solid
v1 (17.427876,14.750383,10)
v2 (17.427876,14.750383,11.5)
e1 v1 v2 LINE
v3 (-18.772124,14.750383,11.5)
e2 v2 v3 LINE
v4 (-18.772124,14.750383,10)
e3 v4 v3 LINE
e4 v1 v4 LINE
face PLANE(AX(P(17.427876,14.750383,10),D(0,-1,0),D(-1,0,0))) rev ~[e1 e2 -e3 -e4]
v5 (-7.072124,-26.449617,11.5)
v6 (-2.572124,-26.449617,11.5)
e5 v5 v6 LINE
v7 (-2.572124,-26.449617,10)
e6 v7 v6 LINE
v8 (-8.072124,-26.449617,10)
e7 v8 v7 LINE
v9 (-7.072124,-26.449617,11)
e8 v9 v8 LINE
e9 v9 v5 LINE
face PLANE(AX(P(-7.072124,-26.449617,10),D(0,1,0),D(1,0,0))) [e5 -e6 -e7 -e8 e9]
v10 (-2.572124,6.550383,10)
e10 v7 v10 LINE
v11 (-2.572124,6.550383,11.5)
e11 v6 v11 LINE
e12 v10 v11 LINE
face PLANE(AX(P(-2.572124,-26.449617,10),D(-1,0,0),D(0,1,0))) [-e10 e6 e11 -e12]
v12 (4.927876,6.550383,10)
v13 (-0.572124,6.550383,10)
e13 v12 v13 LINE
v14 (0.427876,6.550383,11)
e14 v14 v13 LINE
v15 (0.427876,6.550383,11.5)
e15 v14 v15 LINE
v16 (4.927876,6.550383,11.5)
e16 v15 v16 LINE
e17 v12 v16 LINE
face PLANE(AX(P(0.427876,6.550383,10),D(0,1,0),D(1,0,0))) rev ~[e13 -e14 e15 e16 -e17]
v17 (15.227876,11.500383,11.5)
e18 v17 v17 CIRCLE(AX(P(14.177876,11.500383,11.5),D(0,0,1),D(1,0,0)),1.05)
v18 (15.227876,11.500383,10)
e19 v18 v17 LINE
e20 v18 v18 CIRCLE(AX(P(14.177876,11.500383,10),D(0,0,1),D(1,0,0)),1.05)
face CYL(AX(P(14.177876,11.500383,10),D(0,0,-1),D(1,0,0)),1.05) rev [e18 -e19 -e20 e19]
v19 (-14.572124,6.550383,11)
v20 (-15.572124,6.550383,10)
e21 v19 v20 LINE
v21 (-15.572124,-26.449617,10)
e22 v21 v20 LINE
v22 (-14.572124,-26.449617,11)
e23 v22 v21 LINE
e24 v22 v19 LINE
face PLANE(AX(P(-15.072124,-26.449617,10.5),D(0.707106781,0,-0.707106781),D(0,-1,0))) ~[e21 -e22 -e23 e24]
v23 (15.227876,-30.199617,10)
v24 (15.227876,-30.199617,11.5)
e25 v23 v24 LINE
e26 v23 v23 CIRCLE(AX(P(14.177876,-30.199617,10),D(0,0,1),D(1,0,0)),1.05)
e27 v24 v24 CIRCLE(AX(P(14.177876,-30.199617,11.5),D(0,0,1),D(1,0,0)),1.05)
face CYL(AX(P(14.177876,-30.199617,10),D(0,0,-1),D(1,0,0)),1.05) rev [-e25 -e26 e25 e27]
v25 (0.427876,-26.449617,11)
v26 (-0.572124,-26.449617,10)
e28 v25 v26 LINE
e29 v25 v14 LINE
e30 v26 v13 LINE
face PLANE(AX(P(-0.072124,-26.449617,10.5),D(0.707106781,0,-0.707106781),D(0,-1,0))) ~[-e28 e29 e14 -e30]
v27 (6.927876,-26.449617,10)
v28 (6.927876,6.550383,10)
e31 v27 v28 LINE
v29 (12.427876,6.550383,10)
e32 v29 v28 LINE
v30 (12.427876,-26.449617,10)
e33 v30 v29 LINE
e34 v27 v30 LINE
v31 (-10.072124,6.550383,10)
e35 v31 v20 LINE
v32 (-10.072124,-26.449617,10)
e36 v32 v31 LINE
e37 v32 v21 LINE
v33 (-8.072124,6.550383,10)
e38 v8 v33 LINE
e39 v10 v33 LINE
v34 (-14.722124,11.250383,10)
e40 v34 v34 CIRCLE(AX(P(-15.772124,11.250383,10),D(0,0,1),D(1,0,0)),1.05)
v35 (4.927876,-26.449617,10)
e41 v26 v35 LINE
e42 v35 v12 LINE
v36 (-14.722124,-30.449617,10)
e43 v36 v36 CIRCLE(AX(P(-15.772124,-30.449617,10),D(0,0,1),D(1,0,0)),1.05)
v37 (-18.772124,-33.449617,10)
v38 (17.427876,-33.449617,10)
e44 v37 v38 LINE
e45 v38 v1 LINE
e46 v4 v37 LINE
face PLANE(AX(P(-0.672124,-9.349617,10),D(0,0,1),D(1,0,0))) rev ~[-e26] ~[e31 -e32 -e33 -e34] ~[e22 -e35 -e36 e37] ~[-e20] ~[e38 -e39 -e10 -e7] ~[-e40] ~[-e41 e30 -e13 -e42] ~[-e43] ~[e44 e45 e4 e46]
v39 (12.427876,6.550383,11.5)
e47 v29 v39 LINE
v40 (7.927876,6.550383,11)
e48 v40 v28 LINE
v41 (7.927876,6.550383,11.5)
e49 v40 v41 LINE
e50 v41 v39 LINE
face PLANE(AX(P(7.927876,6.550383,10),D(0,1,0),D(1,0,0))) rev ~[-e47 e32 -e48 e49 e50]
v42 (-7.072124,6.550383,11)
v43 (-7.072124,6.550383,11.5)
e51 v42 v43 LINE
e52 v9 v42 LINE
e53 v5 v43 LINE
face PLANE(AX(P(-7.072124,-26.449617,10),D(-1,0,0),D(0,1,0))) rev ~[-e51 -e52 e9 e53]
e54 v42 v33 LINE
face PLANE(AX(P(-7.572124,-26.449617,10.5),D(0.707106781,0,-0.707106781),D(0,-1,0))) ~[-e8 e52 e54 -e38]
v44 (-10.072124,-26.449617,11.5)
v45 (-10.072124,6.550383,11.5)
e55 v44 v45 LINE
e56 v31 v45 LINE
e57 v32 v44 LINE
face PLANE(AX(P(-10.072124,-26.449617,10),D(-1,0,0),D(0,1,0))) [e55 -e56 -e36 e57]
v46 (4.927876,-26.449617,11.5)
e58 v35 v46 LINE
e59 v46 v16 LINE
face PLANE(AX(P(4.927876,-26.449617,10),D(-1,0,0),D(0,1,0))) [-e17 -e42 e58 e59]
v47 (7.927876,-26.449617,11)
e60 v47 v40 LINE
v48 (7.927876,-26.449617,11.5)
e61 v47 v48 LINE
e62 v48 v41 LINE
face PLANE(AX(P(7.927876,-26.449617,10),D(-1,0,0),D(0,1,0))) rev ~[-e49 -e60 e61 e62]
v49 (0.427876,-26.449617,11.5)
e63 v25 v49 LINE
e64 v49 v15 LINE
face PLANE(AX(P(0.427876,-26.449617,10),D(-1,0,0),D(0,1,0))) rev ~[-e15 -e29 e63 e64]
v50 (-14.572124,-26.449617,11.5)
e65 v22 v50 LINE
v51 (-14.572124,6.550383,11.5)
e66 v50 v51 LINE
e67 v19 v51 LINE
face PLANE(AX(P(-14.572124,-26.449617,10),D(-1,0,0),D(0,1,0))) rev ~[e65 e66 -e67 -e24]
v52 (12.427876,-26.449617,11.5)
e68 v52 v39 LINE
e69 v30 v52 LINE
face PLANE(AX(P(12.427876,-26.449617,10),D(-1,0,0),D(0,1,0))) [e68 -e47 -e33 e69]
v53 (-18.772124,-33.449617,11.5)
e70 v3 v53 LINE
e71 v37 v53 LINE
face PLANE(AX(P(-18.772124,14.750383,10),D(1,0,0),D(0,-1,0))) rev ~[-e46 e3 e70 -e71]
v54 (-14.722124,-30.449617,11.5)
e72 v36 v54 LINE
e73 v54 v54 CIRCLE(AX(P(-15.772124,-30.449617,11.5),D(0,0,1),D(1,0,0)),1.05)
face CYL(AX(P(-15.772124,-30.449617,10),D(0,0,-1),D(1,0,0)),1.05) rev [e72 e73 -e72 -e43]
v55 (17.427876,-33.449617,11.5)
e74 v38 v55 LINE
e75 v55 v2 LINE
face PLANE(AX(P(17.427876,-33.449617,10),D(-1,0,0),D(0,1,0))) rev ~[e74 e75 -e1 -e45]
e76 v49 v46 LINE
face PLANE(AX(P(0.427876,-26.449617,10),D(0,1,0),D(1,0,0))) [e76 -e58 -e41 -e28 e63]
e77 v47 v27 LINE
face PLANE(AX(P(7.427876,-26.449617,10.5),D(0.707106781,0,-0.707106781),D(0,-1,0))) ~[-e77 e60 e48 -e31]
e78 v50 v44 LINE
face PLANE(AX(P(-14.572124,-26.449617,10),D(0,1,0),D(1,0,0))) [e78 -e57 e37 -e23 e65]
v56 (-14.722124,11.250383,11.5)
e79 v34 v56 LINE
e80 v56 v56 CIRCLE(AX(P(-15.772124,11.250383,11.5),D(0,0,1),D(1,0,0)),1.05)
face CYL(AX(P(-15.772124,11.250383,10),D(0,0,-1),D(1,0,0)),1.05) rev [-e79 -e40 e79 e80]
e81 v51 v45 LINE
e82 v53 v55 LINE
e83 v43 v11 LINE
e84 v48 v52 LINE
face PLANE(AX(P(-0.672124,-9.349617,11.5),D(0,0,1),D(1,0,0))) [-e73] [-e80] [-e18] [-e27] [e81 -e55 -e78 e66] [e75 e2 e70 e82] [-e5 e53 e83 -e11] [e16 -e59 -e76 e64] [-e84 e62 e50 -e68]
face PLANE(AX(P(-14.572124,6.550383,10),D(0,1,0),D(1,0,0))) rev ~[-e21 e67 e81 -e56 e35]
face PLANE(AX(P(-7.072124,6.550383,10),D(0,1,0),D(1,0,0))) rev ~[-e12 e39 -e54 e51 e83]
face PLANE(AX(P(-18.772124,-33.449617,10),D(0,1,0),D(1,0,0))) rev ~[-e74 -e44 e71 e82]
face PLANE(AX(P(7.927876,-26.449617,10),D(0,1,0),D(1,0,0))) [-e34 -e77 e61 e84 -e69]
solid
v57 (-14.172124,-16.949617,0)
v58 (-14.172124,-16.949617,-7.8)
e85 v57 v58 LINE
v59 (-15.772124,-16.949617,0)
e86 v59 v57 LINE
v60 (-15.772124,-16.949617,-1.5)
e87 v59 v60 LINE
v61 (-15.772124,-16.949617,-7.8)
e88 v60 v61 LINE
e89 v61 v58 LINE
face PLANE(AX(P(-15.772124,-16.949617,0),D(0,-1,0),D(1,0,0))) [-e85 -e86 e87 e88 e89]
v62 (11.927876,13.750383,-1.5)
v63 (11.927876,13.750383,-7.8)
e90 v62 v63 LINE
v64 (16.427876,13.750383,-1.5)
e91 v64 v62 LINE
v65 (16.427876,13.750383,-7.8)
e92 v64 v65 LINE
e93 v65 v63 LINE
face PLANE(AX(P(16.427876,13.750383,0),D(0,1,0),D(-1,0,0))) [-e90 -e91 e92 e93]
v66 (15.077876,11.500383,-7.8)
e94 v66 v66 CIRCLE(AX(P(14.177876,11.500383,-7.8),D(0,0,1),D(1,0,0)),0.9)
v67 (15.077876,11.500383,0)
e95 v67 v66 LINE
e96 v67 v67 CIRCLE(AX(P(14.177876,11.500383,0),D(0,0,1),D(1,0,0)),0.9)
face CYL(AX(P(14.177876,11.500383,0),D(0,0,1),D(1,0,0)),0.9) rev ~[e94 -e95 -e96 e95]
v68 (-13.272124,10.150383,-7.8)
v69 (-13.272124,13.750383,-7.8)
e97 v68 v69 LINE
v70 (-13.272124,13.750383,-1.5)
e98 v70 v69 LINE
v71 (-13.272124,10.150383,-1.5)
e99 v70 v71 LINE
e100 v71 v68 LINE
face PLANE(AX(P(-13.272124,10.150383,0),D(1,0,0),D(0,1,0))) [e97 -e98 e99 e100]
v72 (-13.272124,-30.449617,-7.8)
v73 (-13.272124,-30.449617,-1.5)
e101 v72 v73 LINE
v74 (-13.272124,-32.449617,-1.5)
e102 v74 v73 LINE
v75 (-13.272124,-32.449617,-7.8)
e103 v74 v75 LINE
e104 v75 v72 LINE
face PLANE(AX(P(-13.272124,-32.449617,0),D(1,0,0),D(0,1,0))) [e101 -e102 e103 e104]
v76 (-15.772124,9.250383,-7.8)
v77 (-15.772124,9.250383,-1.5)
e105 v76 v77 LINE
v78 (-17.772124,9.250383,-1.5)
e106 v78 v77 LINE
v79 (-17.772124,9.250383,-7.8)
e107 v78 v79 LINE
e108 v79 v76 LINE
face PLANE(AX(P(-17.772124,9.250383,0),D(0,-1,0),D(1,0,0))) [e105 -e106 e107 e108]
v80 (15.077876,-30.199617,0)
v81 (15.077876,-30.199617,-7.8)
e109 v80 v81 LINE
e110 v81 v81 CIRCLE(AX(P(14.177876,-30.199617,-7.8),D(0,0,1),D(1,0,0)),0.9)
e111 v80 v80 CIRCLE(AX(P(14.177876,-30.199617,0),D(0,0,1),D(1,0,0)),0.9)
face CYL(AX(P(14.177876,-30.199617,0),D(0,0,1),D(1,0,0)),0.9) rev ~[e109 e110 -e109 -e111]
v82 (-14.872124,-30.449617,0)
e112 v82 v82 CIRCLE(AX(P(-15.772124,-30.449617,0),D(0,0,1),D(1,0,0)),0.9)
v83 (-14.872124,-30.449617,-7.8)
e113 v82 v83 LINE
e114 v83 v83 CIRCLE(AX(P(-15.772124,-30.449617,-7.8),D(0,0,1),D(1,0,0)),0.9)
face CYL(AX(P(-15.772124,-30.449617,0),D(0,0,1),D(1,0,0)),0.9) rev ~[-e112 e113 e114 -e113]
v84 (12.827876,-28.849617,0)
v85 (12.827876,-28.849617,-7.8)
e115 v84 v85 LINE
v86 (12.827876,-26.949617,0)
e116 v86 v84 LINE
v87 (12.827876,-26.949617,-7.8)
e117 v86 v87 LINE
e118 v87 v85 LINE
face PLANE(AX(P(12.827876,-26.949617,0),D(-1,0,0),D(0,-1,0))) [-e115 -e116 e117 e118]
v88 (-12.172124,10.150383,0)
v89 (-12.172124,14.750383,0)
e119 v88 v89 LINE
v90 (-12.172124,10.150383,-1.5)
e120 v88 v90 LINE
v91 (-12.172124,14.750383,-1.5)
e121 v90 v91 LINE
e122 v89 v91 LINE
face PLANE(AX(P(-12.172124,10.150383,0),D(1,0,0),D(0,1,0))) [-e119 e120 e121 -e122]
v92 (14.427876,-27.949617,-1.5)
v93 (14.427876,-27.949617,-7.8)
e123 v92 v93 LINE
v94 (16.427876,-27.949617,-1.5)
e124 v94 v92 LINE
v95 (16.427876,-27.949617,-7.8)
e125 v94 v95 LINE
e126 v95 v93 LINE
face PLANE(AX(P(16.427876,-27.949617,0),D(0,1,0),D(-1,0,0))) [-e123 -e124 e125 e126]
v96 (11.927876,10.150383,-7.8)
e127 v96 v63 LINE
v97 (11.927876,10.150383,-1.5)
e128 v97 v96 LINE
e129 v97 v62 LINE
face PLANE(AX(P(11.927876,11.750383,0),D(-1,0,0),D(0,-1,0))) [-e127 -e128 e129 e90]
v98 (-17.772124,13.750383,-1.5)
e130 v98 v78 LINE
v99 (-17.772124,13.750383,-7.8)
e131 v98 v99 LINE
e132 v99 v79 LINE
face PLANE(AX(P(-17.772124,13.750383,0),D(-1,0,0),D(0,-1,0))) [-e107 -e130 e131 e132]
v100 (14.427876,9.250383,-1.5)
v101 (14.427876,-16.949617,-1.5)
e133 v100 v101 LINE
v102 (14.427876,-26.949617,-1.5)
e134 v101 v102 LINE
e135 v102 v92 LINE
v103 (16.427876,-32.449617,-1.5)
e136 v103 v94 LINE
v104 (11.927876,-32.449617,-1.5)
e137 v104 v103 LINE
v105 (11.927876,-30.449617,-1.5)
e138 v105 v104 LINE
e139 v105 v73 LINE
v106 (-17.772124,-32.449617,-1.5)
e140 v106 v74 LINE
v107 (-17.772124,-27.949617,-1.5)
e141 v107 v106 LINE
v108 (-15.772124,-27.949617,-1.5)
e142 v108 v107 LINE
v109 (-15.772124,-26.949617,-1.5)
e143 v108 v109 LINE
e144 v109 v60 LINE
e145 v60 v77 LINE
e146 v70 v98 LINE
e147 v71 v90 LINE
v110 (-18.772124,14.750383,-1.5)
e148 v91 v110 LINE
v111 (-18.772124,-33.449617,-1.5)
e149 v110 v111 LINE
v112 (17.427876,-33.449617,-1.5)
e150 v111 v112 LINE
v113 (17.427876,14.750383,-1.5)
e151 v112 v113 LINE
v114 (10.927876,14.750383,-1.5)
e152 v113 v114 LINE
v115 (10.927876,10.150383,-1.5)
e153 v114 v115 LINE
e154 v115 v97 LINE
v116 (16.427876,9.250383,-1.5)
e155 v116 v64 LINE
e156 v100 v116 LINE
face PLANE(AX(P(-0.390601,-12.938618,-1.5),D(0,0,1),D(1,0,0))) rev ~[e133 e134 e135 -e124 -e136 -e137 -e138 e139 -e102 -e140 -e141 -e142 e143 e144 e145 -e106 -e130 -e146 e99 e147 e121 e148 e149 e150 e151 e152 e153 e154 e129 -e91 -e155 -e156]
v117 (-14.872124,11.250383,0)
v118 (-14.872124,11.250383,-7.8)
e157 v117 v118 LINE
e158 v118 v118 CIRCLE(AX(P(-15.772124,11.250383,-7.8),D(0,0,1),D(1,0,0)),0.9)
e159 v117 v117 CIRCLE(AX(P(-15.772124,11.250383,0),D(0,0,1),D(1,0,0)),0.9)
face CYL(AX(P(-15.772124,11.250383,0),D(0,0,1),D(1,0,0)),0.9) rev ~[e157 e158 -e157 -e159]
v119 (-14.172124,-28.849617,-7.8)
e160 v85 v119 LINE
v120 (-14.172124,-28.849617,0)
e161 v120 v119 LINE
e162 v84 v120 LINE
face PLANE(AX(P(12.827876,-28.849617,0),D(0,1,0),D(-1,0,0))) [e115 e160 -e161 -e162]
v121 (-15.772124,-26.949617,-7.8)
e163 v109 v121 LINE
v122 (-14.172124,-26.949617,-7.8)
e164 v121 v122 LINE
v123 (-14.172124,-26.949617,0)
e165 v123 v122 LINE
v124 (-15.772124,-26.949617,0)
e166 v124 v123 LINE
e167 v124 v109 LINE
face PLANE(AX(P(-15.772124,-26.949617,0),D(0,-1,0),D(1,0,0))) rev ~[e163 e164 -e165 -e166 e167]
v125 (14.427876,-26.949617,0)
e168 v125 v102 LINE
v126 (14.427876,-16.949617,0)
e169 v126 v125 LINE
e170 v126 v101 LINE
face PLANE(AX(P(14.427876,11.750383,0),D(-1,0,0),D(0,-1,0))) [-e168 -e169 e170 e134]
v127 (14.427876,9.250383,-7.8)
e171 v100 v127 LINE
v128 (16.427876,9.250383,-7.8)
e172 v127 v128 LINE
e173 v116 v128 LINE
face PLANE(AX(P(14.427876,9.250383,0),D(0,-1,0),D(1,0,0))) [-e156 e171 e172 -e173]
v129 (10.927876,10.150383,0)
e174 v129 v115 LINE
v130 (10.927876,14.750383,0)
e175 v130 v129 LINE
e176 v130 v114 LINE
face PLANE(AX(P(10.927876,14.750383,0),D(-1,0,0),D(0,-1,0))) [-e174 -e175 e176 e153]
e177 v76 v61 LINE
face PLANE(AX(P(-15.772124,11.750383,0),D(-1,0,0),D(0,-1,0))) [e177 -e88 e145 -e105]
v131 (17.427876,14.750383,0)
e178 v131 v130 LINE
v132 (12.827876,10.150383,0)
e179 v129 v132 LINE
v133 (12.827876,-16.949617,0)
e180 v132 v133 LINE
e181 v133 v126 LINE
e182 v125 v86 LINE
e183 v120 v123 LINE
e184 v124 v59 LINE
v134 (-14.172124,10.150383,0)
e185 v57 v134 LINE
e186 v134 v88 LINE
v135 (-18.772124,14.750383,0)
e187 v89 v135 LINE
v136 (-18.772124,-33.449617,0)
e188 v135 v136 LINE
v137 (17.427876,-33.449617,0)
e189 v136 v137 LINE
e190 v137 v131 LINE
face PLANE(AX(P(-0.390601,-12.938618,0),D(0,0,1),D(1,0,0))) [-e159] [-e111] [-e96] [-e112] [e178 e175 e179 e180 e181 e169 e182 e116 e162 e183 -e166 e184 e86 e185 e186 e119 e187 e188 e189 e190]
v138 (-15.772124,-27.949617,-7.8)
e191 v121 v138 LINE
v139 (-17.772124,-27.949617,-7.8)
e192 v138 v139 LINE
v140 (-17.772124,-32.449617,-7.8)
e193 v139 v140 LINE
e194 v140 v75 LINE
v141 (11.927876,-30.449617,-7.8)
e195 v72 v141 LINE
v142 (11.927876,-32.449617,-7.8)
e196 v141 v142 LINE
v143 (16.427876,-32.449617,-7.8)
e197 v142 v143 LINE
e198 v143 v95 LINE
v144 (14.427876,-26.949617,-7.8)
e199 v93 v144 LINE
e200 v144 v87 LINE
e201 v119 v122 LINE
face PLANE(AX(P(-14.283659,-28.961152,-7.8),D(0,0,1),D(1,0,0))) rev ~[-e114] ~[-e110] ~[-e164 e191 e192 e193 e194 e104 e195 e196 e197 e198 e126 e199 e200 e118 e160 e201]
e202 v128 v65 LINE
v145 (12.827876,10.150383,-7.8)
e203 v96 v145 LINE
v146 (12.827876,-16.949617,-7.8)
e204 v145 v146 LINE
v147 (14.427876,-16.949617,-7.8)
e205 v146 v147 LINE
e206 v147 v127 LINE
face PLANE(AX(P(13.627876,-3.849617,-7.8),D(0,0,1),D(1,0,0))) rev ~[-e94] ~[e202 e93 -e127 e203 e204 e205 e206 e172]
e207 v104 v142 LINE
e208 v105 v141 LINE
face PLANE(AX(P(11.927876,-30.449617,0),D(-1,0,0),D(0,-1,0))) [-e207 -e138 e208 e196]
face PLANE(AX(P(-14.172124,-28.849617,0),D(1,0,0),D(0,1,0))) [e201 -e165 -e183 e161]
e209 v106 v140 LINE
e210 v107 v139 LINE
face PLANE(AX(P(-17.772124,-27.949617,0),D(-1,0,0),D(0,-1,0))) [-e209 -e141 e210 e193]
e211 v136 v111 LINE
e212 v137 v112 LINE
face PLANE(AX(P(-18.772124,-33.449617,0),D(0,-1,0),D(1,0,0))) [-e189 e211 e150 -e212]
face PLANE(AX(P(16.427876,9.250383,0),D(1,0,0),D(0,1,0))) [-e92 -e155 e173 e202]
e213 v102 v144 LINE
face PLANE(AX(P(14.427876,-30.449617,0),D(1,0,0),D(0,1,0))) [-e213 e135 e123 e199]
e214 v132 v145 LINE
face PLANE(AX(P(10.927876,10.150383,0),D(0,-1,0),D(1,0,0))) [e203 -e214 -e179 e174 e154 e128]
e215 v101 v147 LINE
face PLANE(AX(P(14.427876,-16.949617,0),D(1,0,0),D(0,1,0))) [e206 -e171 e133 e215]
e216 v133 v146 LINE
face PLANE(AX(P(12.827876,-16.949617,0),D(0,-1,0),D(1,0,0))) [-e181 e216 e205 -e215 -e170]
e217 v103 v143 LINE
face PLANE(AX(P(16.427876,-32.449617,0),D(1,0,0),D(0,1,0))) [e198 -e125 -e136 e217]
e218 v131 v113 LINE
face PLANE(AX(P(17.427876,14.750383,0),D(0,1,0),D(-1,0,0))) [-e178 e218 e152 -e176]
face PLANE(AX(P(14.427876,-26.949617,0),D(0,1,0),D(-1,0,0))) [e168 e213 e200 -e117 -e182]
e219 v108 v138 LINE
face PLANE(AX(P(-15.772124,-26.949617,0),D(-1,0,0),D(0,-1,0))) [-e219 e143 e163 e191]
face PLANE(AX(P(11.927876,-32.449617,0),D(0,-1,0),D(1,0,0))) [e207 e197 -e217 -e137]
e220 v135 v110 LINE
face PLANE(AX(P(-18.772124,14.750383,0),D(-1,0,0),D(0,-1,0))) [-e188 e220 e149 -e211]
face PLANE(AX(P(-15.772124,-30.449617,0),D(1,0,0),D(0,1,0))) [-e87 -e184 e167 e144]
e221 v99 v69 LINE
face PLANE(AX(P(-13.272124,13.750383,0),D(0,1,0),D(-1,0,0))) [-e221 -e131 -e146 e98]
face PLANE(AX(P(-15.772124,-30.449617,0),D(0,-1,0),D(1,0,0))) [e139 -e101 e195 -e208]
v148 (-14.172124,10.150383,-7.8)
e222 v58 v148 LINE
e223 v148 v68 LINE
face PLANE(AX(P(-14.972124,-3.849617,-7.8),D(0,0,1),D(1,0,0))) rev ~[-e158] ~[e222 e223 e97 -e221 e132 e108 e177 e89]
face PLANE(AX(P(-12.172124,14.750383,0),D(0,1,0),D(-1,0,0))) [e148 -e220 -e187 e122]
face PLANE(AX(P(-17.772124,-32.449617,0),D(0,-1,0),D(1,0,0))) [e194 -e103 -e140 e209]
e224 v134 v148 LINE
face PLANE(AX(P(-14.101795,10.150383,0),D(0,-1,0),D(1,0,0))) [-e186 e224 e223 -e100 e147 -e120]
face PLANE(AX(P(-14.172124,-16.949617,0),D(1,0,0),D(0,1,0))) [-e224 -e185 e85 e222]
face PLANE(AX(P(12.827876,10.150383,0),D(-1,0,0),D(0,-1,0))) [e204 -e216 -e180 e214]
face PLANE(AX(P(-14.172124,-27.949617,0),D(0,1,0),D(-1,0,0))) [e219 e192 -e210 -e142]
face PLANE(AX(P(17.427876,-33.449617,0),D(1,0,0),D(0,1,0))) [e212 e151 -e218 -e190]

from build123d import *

# Parameters (mm, degrees)
F0_W     = 1.6
F0_H     = 1
F1_DEPTH = 7.8
F0_H_2   = 26.2
F0_W_2   = 0.5
F2_DEPTH = 1.5
F3_DEPTH = 7.8
F5_R     = 0.9
F6_DEPTH = 8
F8_R     = 1.05
F8_W     = 4.5
F8_H     = 33
F9_DEPTH = 1.5
F10_SIZE = 1


# Not quite as in the source:
# - a feature names something its author has since deleted; it is built from what else it names


with BuildPart() as f1:
    # F0 (on Top) → F1 (new body)
    with BuildSketch(Plane.XY):
        with BuildLine():
            Line((-14.1721238852, -28.8496168345), (-14.1721238852, -27.9496168345))
            Line((-14.1721238852, -27.9496168345), (-15.7721238852, -27.9496168345))
            Line((-15.7721238852, -27.9496168345), (-15.7721238852, -28.4496168345))
            ThreePointArc((-15.7721238852, -28.4496168345), (-14.3579103228, -29.0354032721), (-13.7721238852, -30.4496168345))
            Line((-13.7721238852, -30.4496168345), (-13.2721238852, -30.4496168345))
            Line((-13.2721238852, -30.4496168345), (-13.2721238852, -28.8496168345))
            Line((-13.2721238852, -28.8496168345), (-14.1721238852, -28.8496168345))
        make_face()
        Polygon((11.9278761148, -28.8496168345), (-13.2721238852, -28.8496168345), (-13.2721238852, -30.4496168345), (11.9278761148, -30.4496168345), (11.9278761148, -30.1996168345), align=None)
        with BuildLine():
            Line((12.3778761148, -28.8496168345), (11.9278761148, -28.8496168345))
            Line((11.9278761148, -28.8496168345), (11.9278761148, -30.1996168345))
            ThreePointArc((11.9278761148, -30.1996168345), (12.0433386942, -29.488104361), (12.3778761148, -28.8496168345))
        make_face()
        with BuildLine():
            ThreePointArc((14.1778761148, -27.9496168345), (13.4663636413, -28.0650794139), (12.8278761148, -28.3996168345))
            Line((12.8278761148, -28.3996168345), (12.8278761148, -28.8496168345))
            Line((12.8278761148, -28.8496168345), (12.3778761148, -28.8496168345))
            ThreePointArc((12.3778761148, -28.8496168345), (12.0433386942, -29.488104361), (11.9278761148, -30.1996168345))
            ThreePointArc((11.9278761148, -30.1996168345), (11.9313618205, -30.3248107853), (11.9418081373, -30.4496168345))
            Line((11.9418081373, -30.4496168345), (14.4278761148, -30.4496168345))
            Line((14.4278761148, -30.4496168345), (14.4278761148, -27.963548857))
            ThreePointArc((14.4278761148, -27.963548857), (14.3030700656, -27.9531025402), (14.1778761148, -27.9496168345))
        make_face()
        with BuildLine():
            Line((14.1778761148, -27.9496168345), (12.8278761148, -27.9496168345))
            Line((12.8278761148, -27.9496168345), (12.8278761148, -28.3996168345))
            ThreePointArc((12.8278761148, -28.3996168345), (13.4663636413, -28.0650794139), (14.1778761148, -27.9496168345))
        make_face()
        with BuildLine():
            ThreePointArc((11.9418081373, -30.4496168345), (11.9313618205, -30.3248107853), (11.9278761148, -30.1996168345))
            Line((11.9278761148, -30.1996168345), (11.9278761148, -30.4496168345))
            Line((11.9278761148, -30.4496168345), (11.9418081373, -30.4496168345))
        make_face()
        with BuildLine():
            Line((14.4278761148, -27.9496168345), (14.1778761148, -27.9496168345))
            ThreePointArc((14.1778761148, -27.9496168345), (14.3030700656, -27.9531025402), (14.4278761148, -27.963548857))
            Line((14.4278761148, -27.963548857), (14.4278761148, -27.9496168345))
        make_face()
        with BuildLine():
            ThreePointArc((-13.7721238852, -30.4496168345), (-14.3579103228, -29.0354032721), (-15.7721238852, -28.4496168345))
            Line((-15.7721238852, -28.4496168345), (-15.7721238852, -30.4496168345))
            Line((-15.7721238852, -30.4496168345), (-13.7721238852, -30.4496168345))
        make_face()
        with Locations((-14.9721238852, -27.4496168345)):
            Rectangle(F0_W, F0_H)
        Polygon((14.4278761148, -26.9496168345), (12.8278761148, -26.9496168345), (12.8278761148, -27.9496168345), (14.1778761148, -27.9496168345), (14.4278761148, -27.9496168345), align=None)
    extrude(amount=-F1_DEPTH)



with BuildPart() as f1b:
    # F0 (on Top) → F1, piece 2 (new body)
    with BuildSketch(Plane.XY):
        Polygon((14.1778761148, 9.2503831655), (12.8278761148, 9.2503831655), (12.8278761148, -16.9496168345), (14.4278761148, -16.9496168345), (14.4278761148, 9.2503831655), align=None)
        with BuildLine():
            ThreePointArc((11.9278761148, 11.5003831655), (12.0433386942, 10.7888706919), (12.3778761148, 10.1503831655))
            Line((12.3778761148, 10.1503831655), (12.8278761148, 10.1503831655))
            Line((12.8278761148, 10.1503831655), (12.8278761148, 9.7003831655))
            ThreePointArc((12.8278761148, 9.7003831655), (13.4663636413, 9.3658457449), (14.1778761148, 9.2503831655))
            ThreePointArc((14.1778761148, 9.2503831655), (14.3030700656, 9.2538688711), (14.4278761148, 9.264315188))
            Line((14.4278761148, 9.264315188), (14.4278761148, 11.7503831655))
            Line((14.4278761148, 11.7503831655), (11.9418081373, 11.7503831655))
            ThreePointArc((11.9418081373, 11.7503831655), (11.9313618205, 11.6255771163), (11.9278761148, 11.5003831655))
        make_face()
        with BuildLine():
            Line((11.9278761148, 11.5003831655), (11.9278761148, 10.1503831655))
            Line((11.9278761148, 10.1503831655), (12.3778761148, 10.1503831655))
            ThreePointArc((12.3778761148, 10.1503831655), (12.0433386942, 10.7888706919), (11.9278761148, 11.5003831655))
        make_face()
        with BuildLine():
            Line((11.9278761148, 11.7503831655), (11.9278761148, 11.5003831655))
            ThreePointArc((11.9278761148, 11.5003831655), (11.9313618205, 11.6255771163), (11.9418081373, 11.7503831655))
            Line((11.9418081373, 11.7503831655), (11.9278761148, 11.7503831655))
        make_face()
        with BuildLine():
            ThreePointArc((14.4278761148, 9.264315188), (14.3030700656, 9.2538688711), (14.1778761148, 9.2503831655))
            Line((14.1778761148, 9.2503831655), (14.4278761148, 9.2503831655))
            Line((14.4278761148, 9.2503831655), (14.4278761148, 9.264315188))
        make_face()
        with BuildLine():
            ThreePointArc((14.1778761148, 9.2503831655), (13.4663636413, 9.3658457449), (12.8278761148, 9.7003831655))
            Line((12.8278761148, 9.7003831655), (12.8278761148, 9.2503831655))
            Line((12.8278761148, 9.2503831655), (14.1778761148, 9.2503831655))
        make_face()
    extrude(amount=-F1_DEPTH)


with BuildPart() as f1c:
    # F0 (on Top) → F1, piece 3 (new body)
    with BuildSketch(Plane.XY):
        with Locations((-14.9721238852, -3.8496168345)):
            Rectangle(F0_W, F0_H_2)
        with BuildLine():
            Line((-14.1017945763, 10.1503831655), (-13.2721238852, 10.1503831655))
            Line((-13.2721238852, 10.1503831655), (-13.2721238852, 13.7503831655))
            Line((-13.2721238852, 13.7503831655), (-13.7721238852, 13.7503831655))
            Line((-13.7721238852, 13.7503831655), (-13.7721238852, 11.7503831655))
            Line((-13.7721238852, 11.7503831655), (-13.8356322121, 11.7503831655))
            ThreePointArc((-13.8356322121, 11.7503831655), (-13.7880644926, 11.5023917504), (-13.7721238852, 11.2503831655))
            ThreePointArc((-13.7721238852, 11.2503831655), (-13.8563135321, 10.6762135989), (-14.1017945763, 10.1503831655))
        make_face()
        with BuildLine():
            Line((-14.1721238852, 9.2503831655), (-14.1721238852, 10.0503831655))
            ThreePointArc((-14.1721238852, 10.0503831655), (-14.8776966942, 9.4615287835), (-15.7721238852, 9.2503831655))
            Line((-15.7721238852, 9.2503831655), (-14.1721238852, 9.2503831655))
        make_face()
        with BuildLine():
            Line((-14.1721238852, 10.1503831655), (-14.1017945763, 10.1503831655))
            ThreePointArc((-14.1017945763, 10.1503831655), (-13.8563135321, 10.6762135989), (-13.7721238852, 11.2503831655))
            ThreePointArc((-13.7721238852, 11.2503831655), (-13.7880644926, 11.5023917504), (-13.8356322121, 11.7503831655))
            Line((-13.8356322121, 11.7503831655), (-15.7721238852, 11.7503831655))
            Line((-15.7721238852, 11.7503831655), (-15.7721238852, 9.2503831655))
            ThreePointArc((-15.7721238852, 9.2503831655), (-14.8776966942, 9.4615287835), (-14.1721238852, 10.0503831655))
            Line((-14.1721238852, 10.0503831655), (-14.1721238852, 10.1503831655))
        make_face()
    extrude(amount=-F1_DEPTH)


with BuildPart() as f1_1:
    add(f1.part)

    add(f1b.part)  # F2 merges F1b

    add(f1c.part)  # F2 merges F1c
    # F0 (on Top) → F2 (join)
    with BuildSketch(Plane.XY):
        Polygon((10.9278761148, 14.7503831655), (10.9278761148, 11.7503831655), (11.9278761148, 11.7503831655), (11.9278761148, 13.7503831655), (14.177876148, 13.7503831655), (16.4278761148, 13.7503831655), (16.4278761148, 11.5003831655), (16.4278761148, 9.2503831655), (14.4278761148, 9.2503831655), (14.4278761148, -16.9496168345), (14.4278761148, -26.9496168345), (14.4278761148, -27.9496168345), (16.4278761148, -27.9496168345), (16.4278761148, -30.1996168345), (16.4278761148, -32.4496168345), (14.1778761148, -32.4496168345), (11.9278761148, -32.4496168345), (11.9278761148, -30.4496168345), (-13.2721238852, -30.4496168345), (-13.2721238852, -32.4496168345), (-15.7721238852, -32.4496168345), (-17.7721238852, -32.4496168345), (-17.7721238852, -30.4496168345), (-17.7721238852, -27.9496168345), (-15.7721238852, -27.9496168345), (-15.7721238852, -26.9496168345), (-15.7721238852, -16.9496168345), (-15.7721238852, 9.2503831655), (-17.7721238852, 9.2503831655), (-17.7721238852, 11.2503831655), (-17.7721238852, 13.7503831655), (-13.7721238852, 13.7503831655), (-13.7721238852, 14.7503831655), (-18.7721238852, 14.7503831655), (-18.7721238852, -33.4496168345), (17.4278761148, -33.4496168345), (17.4278761148, 14.7503831655), align=None)
        with BuildLine():
            Line((-13.7721238852, 11.7503831655), (-13.7721238852, 13.7503831655))
            Line((-13.7721238852, 13.7503831655), (-17.7721238852, 13.7503831655))
            Line((-17.7721238852, 13.7503831655), (-17.7721238852, 11.2503831655))
            ThreePointArc((-17.7721238852, 11.2503831655), (-16.0241324701, 13.234442558), (-13.8356322121, 11.7503831655))
            Line((-13.8356322121, 11.7503831655), (-13.7721238852, 11.7503831655))
        make_face()
        with BuildLine():
            ThreePointArc((-17.7721238852, 11.2503831655), (-17.1863374475, 9.8361696031), (-15.7721238852, 9.2503831655))
            Line((-15.7721238852, 9.2503831655), (-15.7721238852, 11.7503831655))
            Line((-15.7721238852, 11.7503831655), (-13.8356322121, 11.7503831655))
            ThreePointArc((-13.8356322121, 11.7503831655), (-16.0241324701, 13.234442558), (-17.7721238852, 11.2503831655))
        make_face()
        with BuildLine():
            Line((-17.7721238852, 9.2503831655), (-15.7721238852, 9.2503831655))
            ThreePointArc((-15.7721238852, 9.2503831655), (-17.1863374475, 9.8361696031), (-17.7721238852, 11.2503831655))
            Line((-17.7721238852, 11.2503831655), (-17.7721238852, 9.2503831655))
        make_face()
        with BuildLine():
            Line((14.4278761148, 9.264315188), (14.4278761148, 9.2503831655))
            Line((14.4278761148, 9.2503831655), (16.4278761148, 9.2503831655))
            Line((16.4278761148, 9.2503831655), (16.4278761148, 11.5003831655))
            ThreePointArc((16.4278761148, 11.5003831655), (15.854927098, 10.0003831655), (14.4278761148, 9.264315188))
        make_face()
        with BuildLine():
            ThreePointArc((14.177876148, 13.7503831655), (12.6778761272, 13.1774341597), (11.9418081373, 11.7503831655))
            Line((11.9418081373, 11.7503831655), (14.4278761148, 11.7503831655))
            Line((14.4278761148, 11.7503831655), (14.4278761148, 9.264315188))
            ThreePointArc((14.4278761148, 9.264315188), (15.854927098, 10.0003831655), (16.4278761148, 11.5003831655))
            ThreePointArc((16.4278761148, 11.5003831655), (15.7688663842, 13.0913734114), (14.177876148, 13.7503831655))
        make_face()
        with BuildLine():
            Line((16.4278761148, 13.7503831655), (14.177876148, 13.7503831655))
            ThreePointArc((14.177876148, 13.7503831655), (15.7688663842, 13.0913734114), (16.4278761148, 11.5003831655))
            Line((16.4278761148, 11.5003831655), (16.4278761148, 13.7503831655))
        make_face()
        with BuildLine():
            Line((11.9278761148, 13.7503831655), (11.9278761148, 11.7503831655))
            Line((11.9278761148, 11.7503831655), (11.9418081373, 11.7503831655))
            ThreePointArc((11.9418081373, 11.7503831655), (12.6778761272, 13.1774341597), (14.177876148, 13.7503831655))
            Line((14.177876148, 13.7503831655), (11.9278761148, 13.7503831655))
        make_face()
        with BuildLine():
            Line((-13.2721238852, -30.4496168345), (-13.7721238852, -30.4496168345))
            ThreePointArc((-13.7721238852, -30.4496168345), (-14.3579103228, -31.8638303969), (-15.7721238852, -32.4496168345))
            Line((-15.7721238852, -32.4496168345), (-13.2721238852, -32.4496168345))
            Line((-13.2721238852, -32.4496168345), (-13.2721238852, -30.4496168345))
        make_face()
        with BuildLine():
            Line((-15.7721238852, -30.4496168345), (-15.7721238852, -28.4496168345))
            ThreePointArc((-15.7721238852, -28.4496168345), (-17.1863374475, -29.0354032721), (-17.7721238852, -30.4496168345))
            ThreePointArc((-17.7721238852, -30.4496168345), (-17.1863374475, -31.8638303969), (-15.7721238852, -32.4496168345))
            ThreePointArc((-15.7721238852, -32.4496168345), (-14.3579103228, -31.8638303969), (-13.7721238852, -30.4496168345))
            Line((-13.7721238852, -30.4496168345), (-15.7721238852, -30.4496168345))
        make_face()
        with BuildLine():
            ThreePointArc((-15.7721238852, -32.4496168345), (-17.1863374475, -31.8638303969), (-17.7721238852, -30.4496168345))
            Line((-17.7721238852, -30.4496168345), (-17.7721238852, -32.4496168345))
            Line((-17.7721238852, -32.4496168345), (-15.7721238852, -32.4496168345))
        make_face()
        with BuildLine():
            Line((-15.7721238852, -28.4496168345), (-15.7721238852, -27.9496168345))
            Line((-15.7721238852, -27.9496168345), (-17.7721238852, -27.9496168345))
            Line((-17.7721238852, -27.9496168345), (-17.7721238852, -30.4496168345))
            ThreePointArc((-17.7721238852, -30.4496168345), (-17.1863374475, -29.0354032721), (-15.7721238852, -28.4496168345))
        make_face()
        with BuildLine():
            Line((16.4278761148, -27.9496168345), (14.4278761148, -27.9496168345))
            Line((14.4278761148, -27.9496168345), (14.4278761148, -27.963548857))
            ThreePointArc((14.4278761148, -27.963548857), (15.854927098, -28.6996168345), (16.4278761148, -30.1996168345))
            Line((16.4278761148, -30.1996168345), (16.4278761148, -27.9496168345))
        make_face()
        with BuildLine():
            ThreePointArc((16.4278761148, -30.1996168345), (15.854927098, -28.6996168345), (14.4278761148, -27.963548857))
            Line((14.4278761148, -27.963548857), (14.4278761148, -30.4496168345))
            Line((14.4278761148, -30.4496168345), (11.9418081373, -30.4496168345))
            ThreePointArc((11.9418081373, -30.4496168345), (12.6778761148, -31.8766678176), (14.1778761148, -32.4496168345))
            ThreePointArc((14.1778761148, -32.4496168345), (15.7688663725, -31.7906070922), (16.4278761148, -30.1996168345))
        make_face()
        with BuildLine():
            Line((16.4278761148, -32.4496168345), (16.4278761148, -30.1996168345))
            ThreePointArc((16.4278761148, -30.1996168345), (15.7688663725, -31.7906070922), (14.1778761148, -32.4496168345))
            Line((14.1778761148, -32.4496168345), (16.4278761148, -32.4496168345))
        make_face()
        with BuildLine():
            Line((11.9418081373, -30.4496168345), (11.9278761148, -30.4496168345))
            Line((11.9278761148, -30.4496168345), (11.9278761148, -32.4496168345))
            Line((11.9278761148, -32.4496168345), (14.1778761148, -32.4496168345))
            ThreePointArc((14.1778761148, -32.4496168345), (12.6778761148, -31.8766678176), (11.9418081373, -30.4496168345))
        make_face()
        with Locations((-13.5221238852, 14.2503831655)):
            Rectangle(F0_W_2, F0_H)
        with BuildLine():
            Line((-14.1017945763, 10.1503831655), (-13.2721238852, 10.1503831655))
            Line((-13.2721238852, 10.1503831655), (-13.2721238852, 13.7503831655))
            Line((-13.2721238852, 13.7503831655), (-13.7721238852, 13.7503831655))
            Line((-13.7721238852, 13.7503831655), (-13.7721238852, 11.7503831655))
            Line((-13.7721238852, 11.7503831655), (-13.8356322121, 11.7503831655))
            ThreePointArc((-13.8356322121, 11.7503831655), (-13.7880644926, 11.5023917504), (-13.7721238852, 11.2503831655))
            ThreePointArc((-13.7721238852, 11.2503831655), (-13.8563135321, 10.6762135989), (-14.1017945763, 10.1503831655))
        make_face()
        Polygon((-13.2721238852, 10.1503831655), (-12.1721238852, 10.1503831655), (-12.1721238852, 14.7503831655), (-13.2721238852, 14.7503831655), (-13.2721238852, 13.7503831655), align=None)
        Polygon((10.9278761148, 11.7503831655), (10.9278761148, 10.1503831655), (11.9278761148, 10.1503831655), (11.9278761148, 11.5003831655), (11.9278761148, 11.7503831655), align=None)
    extrude(amount=-F2_DEPTH)

    # F0 (on Top) → F3 (join)
    with BuildSketch(Plane.XY):
        with BuildLine():
            ThreePointArc((14.177876148, 13.7503831655), (12.6778761272, 13.1774341597), (11.9418081373, 11.7503831655))
            Line((11.9418081373, 11.7503831655), (14.4278761148, 11.7503831655))
            Line((14.4278761148, 11.7503831655), (14.4278761148, 9.264315188))
            ThreePointArc((14.4278761148, 9.264315188), (15.854927098, 10.0003831655), (16.4278761148, 11.5003831655))
            ThreePointArc((16.4278761148, 11.5003831655), (15.7688663842, 13.0913734114), (14.177876148, 13.7503831655))
        make_face()
        with BuildLine():
            ThreePointArc((14.1778761148, 9.2503831655), (13.4663636413, 9.3658457449), (12.8278761148, 9.7003831655))
            Line((12.8278761148, 9.7003831655), (12.8278761148, 9.2503831655))
            Line((12.8278761148, 9.2503831655), (14.1778761148, 9.2503831655))
        make_face()
        with BuildLine():
            Line((11.9278761148, 13.7503831655), (11.9278761148, 11.7503831655))
            Line((11.9278761148, 11.7503831655), (11.9418081373, 11.7503831655))
            ThreePointArc((11.9418081373, 11.7503831655), (12.6778761272, 13.1774341597), (14.177876148, 13.7503831655))
            Line((14.177876148, 13.7503831655), (11.9278761148, 13.7503831655))
        make_face()
        with BuildLine():
            ThreePointArc((11.9278761148, 11.5003831655), (12.0433386942, 10.7888706919), (12.3778761148, 10.1503831655))
            Line((12.3778761148, 10.1503831655), (12.8278761148, 10.1503831655))
            Line((12.8278761148, 10.1503831655), (12.8278761148, 9.7003831655))
            ThreePointArc((12.8278761148, 9.7003831655), (13.4663636413, 9.3658457449), (14.1778761148, 9.2503831655))
            ThreePointArc((14.1778761148, 9.2503831655), (14.3030700656, 9.2538688711), (14.4278761148, 9.264315188))
            Line((14.4278761148, 9.264315188), (14.4278761148, 11.7503831655))
            Line((14.4278761148, 11.7503831655), (11.9418081373, 11.7503831655))
            ThreePointArc((11.9418081373, 11.7503831655), (11.9313618205, 11.6255771163), (11.9278761148, 11.5003831655))
        make_face()
        with BuildLine():
            Line((11.9278761148, 11.5003831655), (11.9278761148, 10.1503831655))
            Line((11.9278761148, 10.1503831655), (12.3778761148, 10.1503831655))
            ThreePointArc((12.3778761148, 10.1503831655), (12.0433386942, 10.7888706919), (11.9278761148, 11.5003831655))
        make_face()
        with BuildLine():
            Line((-14.1721238852, 10.1503831655), (-14.1017945763, 10.1503831655))
            ThreePointArc((-14.1017945763, 10.1503831655), (-13.8563135321, 10.6762135989), (-13.7721238852, 11.2503831655))
            ThreePointArc((-13.7721238852, 11.2503831655), (-13.7880644926, 11.5023917504), (-13.8356322121, 11.7503831655))
            Line((-13.8356322121, 11.7503831655), (-15.7721238852, 11.7503831655))
            Line((-15.7721238852, 11.7503831655), (-15.7721238852, 9.2503831655))
            ThreePointArc((-15.7721238852, 9.2503831655), (-14.8776966942, 9.4615287835), (-14.1721238852, 10.0503831655))
            Line((-14.1721238852, 10.0503831655), (-14.1721238852, 10.1503831655))
        make_face()
        with BuildLine():
            ThreePointArc((-17.7721238852, 11.2503831655), (-17.1863374475, 9.8361696031), (-15.7721238852, 9.2503831655))
            Line((-15.7721238852, 9.2503831655), (-15.7721238852, 11.7503831655))
            Line((-15.7721238852, 11.7503831655), (-13.8356322121, 11.7503831655))
            ThreePointArc((-13.8356322121, 11.7503831655), (-16.0241324701, 13.234442558), (-17.7721238852, 11.2503831655))
        make_face()
        with BuildLine():
            Line((-13.7721238852, 11.7503831655), (-13.7721238852, 13.7503831655))
            Line((-13.7721238852, 13.7503831655), (-17.7721238852, 13.7503831655))
            Line((-17.7721238852, 13.7503831655), (-17.7721238852, 11.2503831655))
            ThreePointArc((-17.7721238852, 11.2503831655), (-16.0241324701, 13.234442558), (-13.8356322121, 11.7503831655))
            Line((-13.8356322121, 11.7503831655), (-13.7721238852, 11.7503831655))
        make_face()
        with BuildLine():
            Line((-17.7721238852, 9.2503831655), (-15.7721238852, 9.2503831655))
            ThreePointArc((-15.7721238852, 9.2503831655), (-17.1863374475, 9.8361696031), (-17.7721238852, 11.2503831655))
            Line((-17.7721238852, 11.2503831655), (-17.7721238852, 9.2503831655))
        make_face()
        with BuildLine():
            Line((-14.1721238852, 9.2503831655), (-14.1721238852, 10.0503831655))
            ThreePointArc((-14.1721238852, 10.0503831655), (-14.8776966942, 9.4615287835), (-15.7721238852, 9.2503831655))
            Line((-15.7721238852, 9.2503831655), (-14.1721238852, 9.2503831655))
        make_face()
        with BuildLine():
            Line((-14.1017945763, 10.1503831655), (-13.2721238852, 10.1503831655))
            Line((-13.2721238852, 10.1503831655), (-13.2721238852, 13.7503831655))
            Line((-13.2721238852, 13.7503831655), (-13.7721238852, 13.7503831655))
            Line((-13.7721238852, 13.7503831655), (-13.7721238852, 11.7503831655))
            Line((-13.7721238852, 11.7503831655), (-13.8356322121, 11.7503831655))
            ThreePointArc((-13.8356322121, 11.7503831655), (-13.7880644926, 11.5023917504), (-13.7721238852, 11.2503831655))
            ThreePointArc((-13.7721238852, 11.2503831655), (-13.8563135321, 10.6762135989), (-14.1017945763, 10.1503831655))
        make_face()
        with BuildLine():
            Line((16.4278761148, 13.7503831655), (14.177876148, 13.7503831655))
            ThreePointArc((14.177876148, 13.7503831655), (15.7688663842, 13.0913734114), (16.4278761148, 11.5003831655))
            Line((16.4278761148, 11.5003831655), (16.4278761148, 13.7503831655))
        make_face()
        with BuildLine():
            Line((14.4278761148, 9.264315188), (14.4278761148, 9.2503831655))
            Line((14.4278761148, 9.2503831655), (16.4278761148, 9.2503831655))
            Line((16.4278761148, 9.2503831655), (16.4278761148, 11.5003831655))
            ThreePointArc((16.4278761148, 11.5003831655), (15.854927098, 10.0003831655), (14.4278761148, 9.264315188))
        make_face()
        with BuildLine():
            ThreePointArc((16.4278761148, -30.1996168345), (15.854927098, -28.6996168345), (14.4278761148, -27.963548857))
            Line((14.4278761148, -27.963548857), (14.4278761148, -30.4496168345))
            Line((14.4278761148, -30.4496168345), (11.9418081373, -30.4496168345))
            ThreePointArc((11.9418081373, -30.4496168345), (12.6778761148, -31.8766678176), (14.1778761148, -32.4496168345))
            ThreePointArc((14.1778761148, -32.4496168345), (15.7688663725, -31.7906070922), (16.4278761148, -30.1996168345))
        make_face()
        with BuildLine():
            Line((16.4278761148, -27.9496168345), (14.4278761148, -27.9496168345))
            Line((14.4278761148, -27.9496168345), (14.4278761148, -27.963548857))
            ThreePointArc((14.4278761148, -27.963548857), (15.854927098, -28.6996168345), (16.4278761148, -30.1996168345))
            Line((16.4278761148, -30.1996168345), (16.4278761148, -27.9496168345))
        make_face()
        with BuildLine():
            Line((16.4278761148, -32.4496168345), (16.4278761148, -30.1996168345))
            ThreePointArc((16.4278761148, -30.1996168345), (15.7688663725, -31.7906070922), (14.1778761148, -32.4496168345))
            Line((14.1778761148, -32.4496168345), (16.4278761148, -32.4496168345))
        make_face()
        with BuildLine():
            Line((11.9418081373, -30.4496168345), (11.9278761148, -30.4496168345))
            Line((11.9278761148, -30.4496168345), (11.9278761148, -32.4496168345))
            Line((11.9278761148, -32.4496168345), (14.1778761148, -32.4496168345))
            ThreePointArc((14.1778761148, -32.4496168345), (12.6778761148, -31.8766678176), (11.9418081373, -30.4496168345))
        make_face()
        with BuildLine():
            ThreePointArc((14.1778761148, -27.9496168345), (13.4663636413, -28.0650794139), (12.8278761148, -28.3996168345))
            Line((12.8278761148, -28.3996168345), (12.8278761148, -28.8496168345))
            Line((12.8278761148, -28.8496168345), (12.3778761148, -28.8496168345))
            ThreePointArc((12.3778761148, -28.8496168345), (12.0433386942, -29.488104361), (11.9278761148, -30.1996168345))
            ThreePointArc((11.9278761148, -30.1996168345), (11.9313618205, -30.3248107853), (11.9418081373, -30.4496168345))
            Line((11.9418081373, -30.4496168345), (14.4278761148, -30.4496168345))
            Line((14.4278761148, -30.4496168345), (14.4278761148, -27.963548857))
            ThreePointArc((14.4278761148, -27.963548857), (14.3030700656, -27.9531025402), (14.1778761148, -27.9496168345))
        make_face()
        with BuildLine():
            Line((12.3778761148, -28.8496168345), (11.9278761148, -28.8496168345))
            Line((11.9278761148, -28.8496168345), (11.9278761148, -30.1996168345))
            ThreePointArc((11.9278761148, -30.1996168345), (12.0433386942, -29.488104361), (12.3778761148, -28.8496168345))
        make_face()
        with BuildLine():
            Line((14.1778761148, -27.9496168345), (12.8278761148, -27.9496168345))
            Line((12.8278761148, -27.9496168345), (12.8278761148, -28.3996168345))
            ThreePointArc((12.8278761148, -28.3996168345), (13.4663636413, -28.0650794139), (14.1778761148, -27.9496168345))
        make_face()
        with BuildLine():
            Line((-15.7721238852, -28.4496168345), (-15.7721238852, -27.9496168345))
            Line((-15.7721238852, -27.9496168345), (-17.7721238852, -27.9496168345))
            Line((-17.7721238852, -27.9496168345), (-17.7721238852, -30.4496168345))
            ThreePointArc((-17.7721238852, -30.4496168345), (-17.1863374475, -29.0354032721), (-15.7721238852, -28.4496168345))
        make_face()
        with BuildLine():
            Line((-14.1721238852, -28.8496168345), (-14.1721238852, -27.9496168345))
            Line((-14.1721238852, -27.9496168345), (-15.7721238852, -27.9496168345))
            Line((-15.7721238852, -27.9496168345), (-15.7721238852, -28.4496168345))
            ThreePointArc((-15.7721238852, -28.4496168345), (-14.3579103228, -29.0354032721), (-13.7721238852, -30.4496168345))
            Line((-13.7721238852, -30.4496168345), (-13.2721238852, -30.4496168345))
            Line((-13.2721238852, -30.4496168345), (-13.2721238852, -28.8496168345))
            Line((-13.2721238852, -28.8496168345), (-14.1721238852, -28.8496168345))
        make_face()
        with BuildLine():
            Line((-13.2721238852, -30.4496168345), (-13.7721238852, -30.4496168345))
            ThreePointArc((-13.7721238852, -30.4496168345), (-14.3579103228, -31.8638303969), (-15.7721238852, -32.4496168345))
            Line((-15.7721238852, -32.4496168345), (-13.2721238852, -32.4496168345))
            Line((-13.2721238852, -32.4496168345), (-13.2721238852, -30.4496168345))
        make_face()
        with BuildLine():
            ThreePointArc((-15.7721238852, -32.4496168345), (-17.1863374475, -31.8638303969), (-17.7721238852, -30.4496168345))
            Line((-17.7721238852, -30.4496168345), (-17.7721238852, -32.4496168345))
            Line((-17.7721238852, -32.4496168345), (-15.7721238852, -32.4496168345))
        make_face()
        with BuildLine():
            Line((-15.7721238852, -30.4496168345), (-15.7721238852, -28.4496168345))
            ThreePointArc((-15.7721238852, -28.4496168345), (-17.1863374475, -29.0354032721), (-17.7721238852, -30.4496168345))
            ThreePointArc((-17.7721238852, -30.4496168345), (-17.1863374475, -31.8638303969), (-15.7721238852, -32.4496168345))
            ThreePointArc((-15.7721238852, -32.4496168345), (-14.3579103228, -31.8638303969), (-13.7721238852, -30.4496168345))
            Line((-13.7721238852, -30.4496168345), (-15.7721238852, -30.4496168345))
        make_face()
        with BuildLine():
            ThreePointArc((-13.7721238852, -30.4496168345), (-14.3579103228, -29.0354032721), (-15.7721238852, -28.4496168345))
            Line((-15.7721238852, -28.4496168345), (-15.7721238852, -30.4496168345))
            Line((-15.7721238852, -30.4496168345), (-13.7721238852, -30.4496168345))
        make_face()
    extrude(amount=-F3_DEPTH)

    # F5 (on offset) → F6 (cut)
    with BuildSketch(Plane.XY):
        with Locations((14.1778761148, 11.5003831655)):
            Circle(F5_R)
        with Locations((14.1778761148, -30.1996168345)):
            Circle(F5_R)
        with Locations((-15.7721238852, -30.4496168345)):
            Circle(F5_R)
        with Locations((-15.7721238852, 11.2503831655)):
            Circle(F5_R)
    extrude(amount=-F6_DEPTH, mode=Mode.SUBTRACT)


with BuildPart() as f9:
    # F8 (on offset) → F9 (new body)
    with BuildSketch(Plane.XY.offset(10)):
        Polygon((-13.7721238852, 14.7503831655), (-18.7721238852, 14.7503831655), (-18.7721238852, -33.4496168345), (17.4278761148, -33.4496168345), (17.4278761148, 14.7503831655), (10.9278761148, 14.7503831655), align=None)
        with Locations((-15.7721238852, -30.4496168345)):
            Circle(F8_R, mode=Mode.SUBTRACT)
        with Locations((-12.3221238852, -9.9496168345)):
            Rectangle(F8_W, F8_H, mode=Mode.SUBTRACT)
        with Locations((-4.8221238852, -9.9496168345)):
            Rectangle(F8_W, F8_H, mode=Mode.SUBTRACT)
        with Locations((14.1778761148, -30.1996168345)):
            Circle(F8_R, mode=Mode.SUBTRACT)
        with Locations((2.6778761148, -9.9496168345)):
            Rectangle(F8_W, F8_H, mode=Mode.SUBTRACT)
        with Locations((10.1778761148, -9.9496168345)):
            Rectangle(F8_W, F8_H, mode=Mode.SUBTRACT)
        with Locations((-15.7721238852, 11.2503831655)):
            Circle(F8_R, mode=Mode.SUBTRACT)
        with Locations((14.1778761148, 11.5003831655)):
            Circle(F8_R, mode=Mode.SUBTRACT)
    extrude(amount=F9_DEPTH)

    # F10
    f10_edges = [f9.edges().sort_by_distance(p)[0] for p in [
        (7.927876, -9.949617, 10),
        (0.427876, -9.949617, 10),
        (-7.072124, -9.949617, 10),
        (-14.572124, -9.949617, 10),
    ]]
    chamfer(f10_edges, length=F10_SIZE)


solid = Compound([f1_1.part, f9.part])
